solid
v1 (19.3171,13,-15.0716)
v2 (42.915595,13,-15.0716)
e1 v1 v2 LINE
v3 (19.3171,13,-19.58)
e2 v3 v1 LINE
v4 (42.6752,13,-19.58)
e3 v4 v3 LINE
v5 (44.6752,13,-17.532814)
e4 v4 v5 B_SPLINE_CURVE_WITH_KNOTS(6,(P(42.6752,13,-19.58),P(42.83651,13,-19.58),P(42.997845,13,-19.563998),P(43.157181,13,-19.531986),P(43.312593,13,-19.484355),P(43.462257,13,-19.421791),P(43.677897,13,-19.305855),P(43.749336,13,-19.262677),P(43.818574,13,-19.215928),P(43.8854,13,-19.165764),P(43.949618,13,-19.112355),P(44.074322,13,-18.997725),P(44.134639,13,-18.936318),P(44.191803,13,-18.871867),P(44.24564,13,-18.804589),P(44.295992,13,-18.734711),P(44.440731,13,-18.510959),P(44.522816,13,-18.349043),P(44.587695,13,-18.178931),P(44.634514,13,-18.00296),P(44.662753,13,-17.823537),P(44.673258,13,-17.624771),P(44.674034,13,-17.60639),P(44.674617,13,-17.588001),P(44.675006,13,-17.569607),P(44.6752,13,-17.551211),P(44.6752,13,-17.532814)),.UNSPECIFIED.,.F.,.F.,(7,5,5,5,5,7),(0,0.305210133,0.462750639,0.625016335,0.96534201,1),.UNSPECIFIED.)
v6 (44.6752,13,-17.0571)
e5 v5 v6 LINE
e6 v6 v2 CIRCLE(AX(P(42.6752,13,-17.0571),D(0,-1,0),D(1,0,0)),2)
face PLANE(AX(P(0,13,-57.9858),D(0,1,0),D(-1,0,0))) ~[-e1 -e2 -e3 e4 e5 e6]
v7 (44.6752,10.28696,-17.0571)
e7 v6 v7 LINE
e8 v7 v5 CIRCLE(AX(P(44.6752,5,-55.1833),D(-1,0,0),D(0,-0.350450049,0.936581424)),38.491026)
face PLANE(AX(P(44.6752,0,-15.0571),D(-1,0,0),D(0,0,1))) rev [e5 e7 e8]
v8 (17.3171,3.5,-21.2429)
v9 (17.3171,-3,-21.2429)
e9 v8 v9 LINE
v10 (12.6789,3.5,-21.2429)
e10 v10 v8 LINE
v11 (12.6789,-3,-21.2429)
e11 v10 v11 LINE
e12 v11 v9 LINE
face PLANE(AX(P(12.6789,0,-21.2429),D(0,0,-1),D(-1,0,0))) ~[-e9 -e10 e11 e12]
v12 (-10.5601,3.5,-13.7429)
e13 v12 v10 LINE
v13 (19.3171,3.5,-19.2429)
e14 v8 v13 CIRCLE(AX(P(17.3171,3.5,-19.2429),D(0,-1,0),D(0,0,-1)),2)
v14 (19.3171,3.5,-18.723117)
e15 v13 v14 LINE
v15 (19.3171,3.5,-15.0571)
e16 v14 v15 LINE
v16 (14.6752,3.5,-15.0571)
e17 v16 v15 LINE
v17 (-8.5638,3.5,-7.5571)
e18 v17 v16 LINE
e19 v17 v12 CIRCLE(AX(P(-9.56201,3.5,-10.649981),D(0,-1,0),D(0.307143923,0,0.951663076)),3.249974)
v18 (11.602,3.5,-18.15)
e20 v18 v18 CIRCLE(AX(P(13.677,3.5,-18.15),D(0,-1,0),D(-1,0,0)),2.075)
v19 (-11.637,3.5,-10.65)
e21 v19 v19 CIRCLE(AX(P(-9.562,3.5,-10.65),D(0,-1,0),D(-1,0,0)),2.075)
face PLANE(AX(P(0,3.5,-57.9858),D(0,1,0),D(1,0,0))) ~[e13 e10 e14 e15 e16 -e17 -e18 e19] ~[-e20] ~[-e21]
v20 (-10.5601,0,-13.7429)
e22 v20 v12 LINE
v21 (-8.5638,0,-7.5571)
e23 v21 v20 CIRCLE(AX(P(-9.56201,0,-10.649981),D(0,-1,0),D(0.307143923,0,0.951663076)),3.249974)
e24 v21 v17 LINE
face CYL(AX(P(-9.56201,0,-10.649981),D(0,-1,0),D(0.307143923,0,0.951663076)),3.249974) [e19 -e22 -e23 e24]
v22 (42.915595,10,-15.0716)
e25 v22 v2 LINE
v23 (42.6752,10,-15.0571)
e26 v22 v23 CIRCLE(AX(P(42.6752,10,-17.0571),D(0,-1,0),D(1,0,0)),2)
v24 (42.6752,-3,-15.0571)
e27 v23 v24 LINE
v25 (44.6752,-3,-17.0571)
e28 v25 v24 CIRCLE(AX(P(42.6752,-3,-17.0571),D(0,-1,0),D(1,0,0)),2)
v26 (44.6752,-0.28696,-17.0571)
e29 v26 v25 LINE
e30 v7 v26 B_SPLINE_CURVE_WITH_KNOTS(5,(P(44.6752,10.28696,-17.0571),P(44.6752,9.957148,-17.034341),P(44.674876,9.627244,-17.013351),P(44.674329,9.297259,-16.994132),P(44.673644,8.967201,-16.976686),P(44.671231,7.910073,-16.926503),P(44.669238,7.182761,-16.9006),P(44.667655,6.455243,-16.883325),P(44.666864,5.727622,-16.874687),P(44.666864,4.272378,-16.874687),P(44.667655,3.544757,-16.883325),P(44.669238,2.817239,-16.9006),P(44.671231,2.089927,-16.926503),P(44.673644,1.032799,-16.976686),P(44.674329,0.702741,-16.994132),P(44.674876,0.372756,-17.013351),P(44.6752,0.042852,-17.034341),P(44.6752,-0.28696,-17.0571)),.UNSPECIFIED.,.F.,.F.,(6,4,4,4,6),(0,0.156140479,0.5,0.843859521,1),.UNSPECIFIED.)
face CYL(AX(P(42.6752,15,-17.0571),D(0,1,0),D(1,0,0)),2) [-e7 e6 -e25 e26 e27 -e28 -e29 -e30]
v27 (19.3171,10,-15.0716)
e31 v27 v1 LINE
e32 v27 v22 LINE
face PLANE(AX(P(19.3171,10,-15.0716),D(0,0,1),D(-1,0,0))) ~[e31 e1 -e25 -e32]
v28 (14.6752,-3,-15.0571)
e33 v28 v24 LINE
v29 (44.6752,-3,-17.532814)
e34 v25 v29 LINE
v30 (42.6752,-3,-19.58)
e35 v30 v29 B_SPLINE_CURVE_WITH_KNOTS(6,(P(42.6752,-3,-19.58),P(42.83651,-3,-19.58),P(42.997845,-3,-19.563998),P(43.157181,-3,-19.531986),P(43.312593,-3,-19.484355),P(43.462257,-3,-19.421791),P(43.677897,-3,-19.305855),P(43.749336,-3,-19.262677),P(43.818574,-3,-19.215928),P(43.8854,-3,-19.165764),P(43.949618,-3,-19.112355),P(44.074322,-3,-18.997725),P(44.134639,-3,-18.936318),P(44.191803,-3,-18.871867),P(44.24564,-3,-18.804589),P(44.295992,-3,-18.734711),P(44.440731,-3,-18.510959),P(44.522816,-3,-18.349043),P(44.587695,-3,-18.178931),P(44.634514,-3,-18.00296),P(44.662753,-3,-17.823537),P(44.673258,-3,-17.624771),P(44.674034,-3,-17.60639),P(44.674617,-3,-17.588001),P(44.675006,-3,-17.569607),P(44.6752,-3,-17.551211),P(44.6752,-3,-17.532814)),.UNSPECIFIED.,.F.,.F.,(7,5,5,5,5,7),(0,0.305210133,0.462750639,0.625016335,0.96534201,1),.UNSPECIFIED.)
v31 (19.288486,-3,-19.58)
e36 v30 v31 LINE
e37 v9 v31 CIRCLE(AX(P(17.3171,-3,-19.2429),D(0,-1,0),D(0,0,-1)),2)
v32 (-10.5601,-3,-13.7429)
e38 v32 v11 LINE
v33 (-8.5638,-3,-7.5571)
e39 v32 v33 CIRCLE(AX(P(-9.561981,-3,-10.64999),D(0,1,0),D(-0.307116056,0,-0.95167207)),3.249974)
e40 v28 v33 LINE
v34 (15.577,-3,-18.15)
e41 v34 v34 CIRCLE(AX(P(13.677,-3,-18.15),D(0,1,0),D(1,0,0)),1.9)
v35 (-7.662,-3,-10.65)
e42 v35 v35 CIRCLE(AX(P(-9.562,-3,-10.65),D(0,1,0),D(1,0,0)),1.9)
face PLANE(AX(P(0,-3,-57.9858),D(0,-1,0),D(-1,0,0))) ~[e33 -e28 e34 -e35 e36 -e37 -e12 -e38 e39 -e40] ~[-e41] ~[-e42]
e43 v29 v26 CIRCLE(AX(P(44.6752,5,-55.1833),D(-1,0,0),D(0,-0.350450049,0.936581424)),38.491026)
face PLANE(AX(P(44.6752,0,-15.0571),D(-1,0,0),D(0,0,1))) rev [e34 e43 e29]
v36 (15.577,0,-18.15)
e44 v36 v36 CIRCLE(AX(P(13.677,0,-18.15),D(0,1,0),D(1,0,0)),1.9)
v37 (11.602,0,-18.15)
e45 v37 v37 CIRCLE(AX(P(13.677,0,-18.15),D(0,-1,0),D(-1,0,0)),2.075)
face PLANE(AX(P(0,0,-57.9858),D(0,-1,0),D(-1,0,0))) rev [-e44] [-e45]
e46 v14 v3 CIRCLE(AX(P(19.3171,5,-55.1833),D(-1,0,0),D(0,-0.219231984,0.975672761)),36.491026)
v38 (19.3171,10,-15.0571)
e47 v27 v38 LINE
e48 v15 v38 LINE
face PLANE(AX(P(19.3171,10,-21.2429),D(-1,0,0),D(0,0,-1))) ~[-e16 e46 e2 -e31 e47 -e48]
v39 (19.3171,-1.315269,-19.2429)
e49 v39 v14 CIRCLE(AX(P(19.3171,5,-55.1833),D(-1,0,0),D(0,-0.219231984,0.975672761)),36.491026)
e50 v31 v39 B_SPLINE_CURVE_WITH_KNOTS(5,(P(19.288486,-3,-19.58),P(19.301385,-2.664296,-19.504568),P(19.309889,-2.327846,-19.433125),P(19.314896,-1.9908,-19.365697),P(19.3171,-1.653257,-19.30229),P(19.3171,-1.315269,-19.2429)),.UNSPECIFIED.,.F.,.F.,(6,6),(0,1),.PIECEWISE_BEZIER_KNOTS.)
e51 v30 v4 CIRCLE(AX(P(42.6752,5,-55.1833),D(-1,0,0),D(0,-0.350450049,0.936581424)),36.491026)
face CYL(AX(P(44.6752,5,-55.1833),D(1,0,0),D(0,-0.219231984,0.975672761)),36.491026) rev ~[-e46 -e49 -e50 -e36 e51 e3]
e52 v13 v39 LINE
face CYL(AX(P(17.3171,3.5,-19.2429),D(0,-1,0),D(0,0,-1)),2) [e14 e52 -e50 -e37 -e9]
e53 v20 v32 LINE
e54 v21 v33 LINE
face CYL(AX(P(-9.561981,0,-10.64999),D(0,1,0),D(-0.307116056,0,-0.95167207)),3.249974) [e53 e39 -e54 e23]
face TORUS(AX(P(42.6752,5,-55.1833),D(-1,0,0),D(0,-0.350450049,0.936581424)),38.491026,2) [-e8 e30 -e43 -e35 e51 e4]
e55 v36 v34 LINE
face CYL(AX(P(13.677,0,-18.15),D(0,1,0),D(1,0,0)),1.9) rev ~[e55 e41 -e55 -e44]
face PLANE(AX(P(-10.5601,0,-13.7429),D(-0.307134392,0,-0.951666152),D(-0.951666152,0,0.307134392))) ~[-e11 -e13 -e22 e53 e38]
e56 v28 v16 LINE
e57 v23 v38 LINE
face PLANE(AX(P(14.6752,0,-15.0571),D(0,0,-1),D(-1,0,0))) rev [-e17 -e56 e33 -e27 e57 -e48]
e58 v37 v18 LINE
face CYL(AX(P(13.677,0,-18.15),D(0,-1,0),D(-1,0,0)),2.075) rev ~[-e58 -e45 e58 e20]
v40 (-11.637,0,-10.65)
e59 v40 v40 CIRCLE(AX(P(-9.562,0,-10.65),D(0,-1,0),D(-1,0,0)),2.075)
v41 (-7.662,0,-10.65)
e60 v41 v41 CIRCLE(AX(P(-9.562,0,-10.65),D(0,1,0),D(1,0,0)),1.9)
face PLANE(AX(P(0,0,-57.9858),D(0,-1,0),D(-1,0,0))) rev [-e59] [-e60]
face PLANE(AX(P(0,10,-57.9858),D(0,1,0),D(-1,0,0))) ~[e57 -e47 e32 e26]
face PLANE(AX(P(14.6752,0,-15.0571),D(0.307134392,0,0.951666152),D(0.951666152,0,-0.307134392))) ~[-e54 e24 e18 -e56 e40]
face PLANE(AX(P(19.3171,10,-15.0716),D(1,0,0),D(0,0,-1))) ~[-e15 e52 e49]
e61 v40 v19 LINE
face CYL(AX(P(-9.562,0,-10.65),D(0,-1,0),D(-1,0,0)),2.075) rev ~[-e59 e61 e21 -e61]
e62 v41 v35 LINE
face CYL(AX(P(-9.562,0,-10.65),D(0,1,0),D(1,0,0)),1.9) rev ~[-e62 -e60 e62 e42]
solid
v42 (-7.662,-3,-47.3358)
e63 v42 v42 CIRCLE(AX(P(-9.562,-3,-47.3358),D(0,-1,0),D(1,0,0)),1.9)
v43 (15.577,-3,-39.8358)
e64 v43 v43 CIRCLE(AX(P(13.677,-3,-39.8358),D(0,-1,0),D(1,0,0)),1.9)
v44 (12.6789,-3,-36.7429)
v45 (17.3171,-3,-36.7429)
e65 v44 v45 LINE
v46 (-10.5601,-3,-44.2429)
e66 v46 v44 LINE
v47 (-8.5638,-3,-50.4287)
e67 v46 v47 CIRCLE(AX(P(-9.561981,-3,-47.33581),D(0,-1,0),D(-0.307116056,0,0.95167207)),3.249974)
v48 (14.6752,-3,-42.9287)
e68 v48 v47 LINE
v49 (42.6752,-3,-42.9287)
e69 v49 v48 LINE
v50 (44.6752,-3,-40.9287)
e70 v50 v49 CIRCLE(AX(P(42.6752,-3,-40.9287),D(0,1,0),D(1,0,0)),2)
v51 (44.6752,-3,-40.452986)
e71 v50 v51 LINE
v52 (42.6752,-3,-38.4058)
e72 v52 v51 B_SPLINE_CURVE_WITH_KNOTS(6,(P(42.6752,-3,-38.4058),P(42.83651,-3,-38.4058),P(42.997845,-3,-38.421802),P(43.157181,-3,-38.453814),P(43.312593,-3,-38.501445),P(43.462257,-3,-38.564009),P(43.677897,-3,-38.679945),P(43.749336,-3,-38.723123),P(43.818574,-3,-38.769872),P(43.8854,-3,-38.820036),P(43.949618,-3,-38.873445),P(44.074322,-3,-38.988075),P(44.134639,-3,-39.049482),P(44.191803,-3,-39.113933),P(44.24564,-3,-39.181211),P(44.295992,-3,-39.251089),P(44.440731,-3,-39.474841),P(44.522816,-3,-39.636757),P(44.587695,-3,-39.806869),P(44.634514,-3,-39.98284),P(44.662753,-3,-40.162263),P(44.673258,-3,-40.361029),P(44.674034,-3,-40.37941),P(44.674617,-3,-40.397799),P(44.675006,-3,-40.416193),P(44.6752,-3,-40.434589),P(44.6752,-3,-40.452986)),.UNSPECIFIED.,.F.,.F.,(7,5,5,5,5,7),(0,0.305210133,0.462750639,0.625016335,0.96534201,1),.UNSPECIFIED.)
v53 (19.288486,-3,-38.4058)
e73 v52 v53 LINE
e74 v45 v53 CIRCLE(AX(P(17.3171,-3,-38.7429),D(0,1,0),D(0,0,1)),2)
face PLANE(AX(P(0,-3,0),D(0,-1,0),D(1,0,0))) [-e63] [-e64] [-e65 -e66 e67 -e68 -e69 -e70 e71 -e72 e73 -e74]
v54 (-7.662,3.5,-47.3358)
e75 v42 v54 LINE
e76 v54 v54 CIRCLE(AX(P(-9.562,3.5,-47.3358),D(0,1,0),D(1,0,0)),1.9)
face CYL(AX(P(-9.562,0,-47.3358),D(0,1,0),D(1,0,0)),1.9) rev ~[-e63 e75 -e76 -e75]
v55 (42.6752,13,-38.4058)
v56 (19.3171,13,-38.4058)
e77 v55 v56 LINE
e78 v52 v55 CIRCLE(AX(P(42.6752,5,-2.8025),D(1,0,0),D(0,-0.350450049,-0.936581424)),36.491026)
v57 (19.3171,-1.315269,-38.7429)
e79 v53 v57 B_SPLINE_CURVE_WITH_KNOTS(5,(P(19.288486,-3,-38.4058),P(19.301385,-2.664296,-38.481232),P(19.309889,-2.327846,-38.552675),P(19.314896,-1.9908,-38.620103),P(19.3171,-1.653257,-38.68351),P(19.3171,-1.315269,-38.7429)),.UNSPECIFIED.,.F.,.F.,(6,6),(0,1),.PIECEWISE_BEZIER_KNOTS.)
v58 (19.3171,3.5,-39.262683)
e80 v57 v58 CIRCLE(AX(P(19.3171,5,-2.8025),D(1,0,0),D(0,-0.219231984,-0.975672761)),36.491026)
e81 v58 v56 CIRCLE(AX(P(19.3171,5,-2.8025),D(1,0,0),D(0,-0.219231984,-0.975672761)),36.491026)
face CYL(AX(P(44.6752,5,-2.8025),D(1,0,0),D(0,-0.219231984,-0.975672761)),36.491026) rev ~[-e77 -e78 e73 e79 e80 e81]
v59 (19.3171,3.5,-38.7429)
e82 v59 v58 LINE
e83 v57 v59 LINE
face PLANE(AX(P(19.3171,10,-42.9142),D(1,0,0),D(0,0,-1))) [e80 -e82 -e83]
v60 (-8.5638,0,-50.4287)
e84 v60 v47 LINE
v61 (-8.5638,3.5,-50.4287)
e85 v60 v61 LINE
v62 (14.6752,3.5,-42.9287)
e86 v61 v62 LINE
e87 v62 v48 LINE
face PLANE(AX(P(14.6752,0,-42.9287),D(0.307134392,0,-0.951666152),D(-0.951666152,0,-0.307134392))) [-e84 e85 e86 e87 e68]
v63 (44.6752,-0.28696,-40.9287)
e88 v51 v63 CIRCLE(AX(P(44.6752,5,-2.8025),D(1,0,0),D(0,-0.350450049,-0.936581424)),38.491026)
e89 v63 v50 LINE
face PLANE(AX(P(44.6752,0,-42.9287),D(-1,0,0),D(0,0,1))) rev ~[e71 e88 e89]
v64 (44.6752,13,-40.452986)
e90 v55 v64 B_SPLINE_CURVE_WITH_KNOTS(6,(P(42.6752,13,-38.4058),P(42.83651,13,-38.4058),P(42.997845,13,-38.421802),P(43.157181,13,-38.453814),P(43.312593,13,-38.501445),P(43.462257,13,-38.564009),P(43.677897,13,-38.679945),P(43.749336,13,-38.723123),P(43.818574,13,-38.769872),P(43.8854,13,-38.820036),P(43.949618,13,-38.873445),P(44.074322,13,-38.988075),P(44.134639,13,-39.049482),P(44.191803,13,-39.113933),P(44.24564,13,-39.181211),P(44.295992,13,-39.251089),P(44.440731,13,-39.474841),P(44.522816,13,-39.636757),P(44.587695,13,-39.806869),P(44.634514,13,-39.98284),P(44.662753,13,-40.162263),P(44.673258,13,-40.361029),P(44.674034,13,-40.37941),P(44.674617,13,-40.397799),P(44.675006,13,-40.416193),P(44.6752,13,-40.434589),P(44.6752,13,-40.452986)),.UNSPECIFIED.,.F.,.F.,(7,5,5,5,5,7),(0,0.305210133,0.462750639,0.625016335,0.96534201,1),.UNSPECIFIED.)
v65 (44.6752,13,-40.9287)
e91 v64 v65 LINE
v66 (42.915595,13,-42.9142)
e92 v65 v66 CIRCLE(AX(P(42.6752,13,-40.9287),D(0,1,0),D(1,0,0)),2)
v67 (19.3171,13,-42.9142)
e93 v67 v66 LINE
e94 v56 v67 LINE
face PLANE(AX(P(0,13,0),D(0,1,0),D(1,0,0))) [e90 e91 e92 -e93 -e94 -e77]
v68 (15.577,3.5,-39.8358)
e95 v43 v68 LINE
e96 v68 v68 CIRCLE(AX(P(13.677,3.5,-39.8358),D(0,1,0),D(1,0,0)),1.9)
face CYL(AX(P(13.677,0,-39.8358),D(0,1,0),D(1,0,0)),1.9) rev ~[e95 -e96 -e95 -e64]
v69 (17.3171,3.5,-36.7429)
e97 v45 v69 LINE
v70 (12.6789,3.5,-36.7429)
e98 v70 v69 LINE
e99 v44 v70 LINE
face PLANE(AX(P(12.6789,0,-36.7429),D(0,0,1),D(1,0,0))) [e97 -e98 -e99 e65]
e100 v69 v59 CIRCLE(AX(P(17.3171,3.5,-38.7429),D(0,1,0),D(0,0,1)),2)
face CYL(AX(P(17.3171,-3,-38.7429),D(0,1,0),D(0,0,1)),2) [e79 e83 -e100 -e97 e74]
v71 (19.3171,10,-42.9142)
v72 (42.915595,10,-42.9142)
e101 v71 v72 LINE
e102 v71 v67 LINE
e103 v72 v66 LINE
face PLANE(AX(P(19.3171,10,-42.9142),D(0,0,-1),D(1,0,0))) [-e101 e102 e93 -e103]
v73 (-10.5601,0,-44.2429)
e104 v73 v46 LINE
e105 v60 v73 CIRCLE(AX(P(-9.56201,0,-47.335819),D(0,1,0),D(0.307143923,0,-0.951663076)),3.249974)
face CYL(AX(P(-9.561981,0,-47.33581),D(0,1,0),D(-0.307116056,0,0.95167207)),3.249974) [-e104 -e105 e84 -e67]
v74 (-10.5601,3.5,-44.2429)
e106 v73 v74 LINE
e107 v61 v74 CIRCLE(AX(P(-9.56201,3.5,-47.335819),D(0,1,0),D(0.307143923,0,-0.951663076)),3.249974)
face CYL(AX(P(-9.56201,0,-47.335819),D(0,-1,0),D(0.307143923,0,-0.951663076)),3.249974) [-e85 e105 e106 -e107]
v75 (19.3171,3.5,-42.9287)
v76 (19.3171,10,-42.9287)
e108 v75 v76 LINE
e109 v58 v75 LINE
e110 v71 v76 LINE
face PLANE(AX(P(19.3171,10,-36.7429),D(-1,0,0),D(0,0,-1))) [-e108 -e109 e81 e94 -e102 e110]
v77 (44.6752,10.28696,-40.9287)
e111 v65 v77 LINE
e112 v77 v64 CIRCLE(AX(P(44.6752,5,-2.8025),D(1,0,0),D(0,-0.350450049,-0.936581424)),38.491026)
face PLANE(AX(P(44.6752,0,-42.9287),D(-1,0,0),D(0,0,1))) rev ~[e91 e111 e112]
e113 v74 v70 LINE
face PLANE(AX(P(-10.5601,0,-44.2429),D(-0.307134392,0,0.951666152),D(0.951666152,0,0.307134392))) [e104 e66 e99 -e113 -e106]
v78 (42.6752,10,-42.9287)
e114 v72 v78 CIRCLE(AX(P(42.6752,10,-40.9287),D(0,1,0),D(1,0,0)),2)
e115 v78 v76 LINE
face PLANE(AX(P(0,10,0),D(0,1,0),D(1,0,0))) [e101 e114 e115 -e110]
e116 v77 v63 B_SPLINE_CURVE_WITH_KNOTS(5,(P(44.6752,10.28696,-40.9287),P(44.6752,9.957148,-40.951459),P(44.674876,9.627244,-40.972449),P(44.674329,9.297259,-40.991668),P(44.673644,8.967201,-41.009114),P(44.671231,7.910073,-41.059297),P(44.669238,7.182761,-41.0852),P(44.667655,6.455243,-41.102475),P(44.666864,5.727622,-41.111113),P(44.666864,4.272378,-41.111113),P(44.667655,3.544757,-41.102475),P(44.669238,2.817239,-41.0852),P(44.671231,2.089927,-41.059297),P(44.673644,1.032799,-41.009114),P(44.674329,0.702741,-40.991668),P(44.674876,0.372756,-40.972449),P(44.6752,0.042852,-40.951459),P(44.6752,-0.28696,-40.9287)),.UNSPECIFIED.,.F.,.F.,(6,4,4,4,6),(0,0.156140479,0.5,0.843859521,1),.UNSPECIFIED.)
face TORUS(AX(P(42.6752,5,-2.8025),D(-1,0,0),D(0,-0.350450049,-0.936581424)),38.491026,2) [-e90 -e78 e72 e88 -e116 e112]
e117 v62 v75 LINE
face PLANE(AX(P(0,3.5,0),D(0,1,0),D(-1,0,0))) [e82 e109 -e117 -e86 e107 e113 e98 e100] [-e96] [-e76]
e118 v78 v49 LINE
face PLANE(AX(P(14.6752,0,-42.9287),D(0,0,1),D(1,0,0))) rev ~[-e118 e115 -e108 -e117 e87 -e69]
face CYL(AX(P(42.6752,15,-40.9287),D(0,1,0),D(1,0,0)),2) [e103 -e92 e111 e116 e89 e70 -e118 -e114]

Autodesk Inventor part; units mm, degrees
ref_plane "YZ Plane" through (0, 0, 0) normal (1, 0, 0) x (0, 1, 0)
ref_plane "XZ Plane" through (0, 0, 0) normal (0, 1, 0) x (-1, 0, 0)
ref_plane "XY Plane" through (0, 0, 0) normal (0, 0, 1) x (1, 0, 0)
sketch "Sketch1" plane through (0, 0, 0) normal (0, 1, 0) x (-1, 0, 0)
  line L0 (27.1998, -28.5532) -> (-70.2595, -28.5532)
  circle A0 centre (9.562, -47.3358) radius 2.075
  arc A1 (8.5638, -50.4287) -> (10.5601, -44.2429) centre (9.562, -47.3358) ccw
  circle A2 centre (-13.677, -39.8358) radius 2.075
  line L1 (10.5601, -44.2429) -> (-12.6789, -36.7429)
  line L2 (8.5638, -50.4287) -> (-14.6752, -42.9287)
  line L3 (-14.6752, -42.9287) -> (-44.6752, -42.9287)
  line L4 (-12.6789, -36.7429) -> (-19.3171, -36.7429)
  line L5 (-44.6752, -38.4058) -> (-44.6752, -42.9287)
  line L6 (-19.3171, -36.7429) -> (-44.6752, -38.4058)
  circle A3 centre (9.562, -9.7705) radius 2.075
  arc A4 (10.5601, -12.8635) -> (8.5638, -6.6776) centre (9.562, -9.7705) ccw
  circle A5 centre (-13.677, -17.2705) radius 2.075
  line L7 (10.5601, -12.8635) -> (-12.6789, -20.3635)
  line L8 (8.5638, -6.6776) -> (-14.6752, -14.1776)
  line L9 (-14.6752, -14.1776) -> (-44.6752, -14.1776)
  line L10 (-12.6789, -20.3635) -> (-19.3171, -20.3635)
  line L11 (-44.6752, -18.7005) -> (-44.6752, -14.1776)
  line L12 (-19.3171, -20.3635) -> (-44.6752, -18.7005)
  dimension "d26" = 4.15
extrude "Extrusion1" add sketch "Sketch1" along normal blind 3.5 contours L2 L3 L5 L6 L4 L1 A1
sketch "Sketch2" plane through (0, 3.5, 0) normal (0, 1, 0) x (1, 0, 0)
  line L0 (19.3171, 36.7429) -> (44.6752, 38.4058) projected
  line L1 (19.3171, 36.7429) -> (44.6752, 38.4058)
  line L2 (19.3171, 36.7429) -> (19.3171, 42.9287)
  line L3 (44.6752, 42.9287) -> (14.6752, 42.9287) projected
  line L4 (19.3171, 42.9287) -> (44.6752, 42.9287)
  line L5 (44.6752, 42.9287) -> (44.6752, 38.4058)
  point P0 (0, 0)
  point P1 (44.6752, 18.7005)
  point P2 (19.3171, 20.3635)
  point P3 (44.6752, 14.1776)
extrude "Extrusion2" add sketch "Sketch2" along normal blind 6.5
sketch "Sketch4" plane through (0, 10, 0) normal (0, 1, 0) x (1, 0, 0)
  line L0 (19.3171, 36.7429) -> (44.6752, 38.4058) projected
  line L1 (19.3171, 36.7429) -> (19.3171, 42.9142)
  line L2 (19.3171, 42.9142) -> (44.6752, 42.9142)
  line L3 (44.6752, 38.4058) -> (44.6752, 42.9287) projected
  line L4 (44.6752, 42.9142) -> (44.6752, 38.4058)
  line L5 (44.6752, 38.4058) -> (19.3171, 36.7429)
  point P0 (0, 0)
extrude "Extrusion4" add sketch "Sketch4" along normal blind 3
sketch "Sketch5" plane through (0, 0, 0) normal (0, -1, 0) x (1, 0, 0)
  line L0 (14.6752, -42.9287) -> (-8.5638, -50.4287) projected
  line L1 (44.6752, -42.9287) -> (19.3171, -42.9287) projected
  line L2 (14.6752, -42.9287) -> (44.6752, -42.9287)
  line L3 (19.3171, -36.7429) -> (44.6752, -38.4058) projected
  line L4 (44.6752, -42.9287) -> (44.6752, -38.4058)
  line L5 (44.6752, -38.4058) -> (19.3171, -36.7429)
  line L6 (12.6789, -36.7429) -> (19.3171, -36.7429) projected
  line L7 (19.3171, -36.7429) -> (12.6789, -36.7429)
  line L8 (-10.5601, -44.2429) -> (12.6789, -36.7429) projected
  line L9 (12.6789, -36.7429) -> (-10.5601, -44.2429)
  arc A0 (-10.5601, -44.2429) -> (-8.5638, -50.4287) centre (-9.562, -47.3358) ccw
  circle A1 centre (-9.562, -47.3358) radius 1.9
  circle A2 centre (13.677, -39.8358) radius 1.9
  point P0 (0, 0)
  dimension "d27" = 3.8
  dimension "d28" = 3.8
extrude "Extrusion5" add sketch "Sketch5" along normal blind 3
sketch "Sketch6" plane through (-9.562, 0, -47.3358) normal (0, 1, 0) x (1, 0, 0)
  circle A0 centre (0, 0) radius 1.9
  circle A1 centre (0, 0) radius 2.075
  circle A2 centre (23.239, -7.5) radius 1.9 projected
  circle A3 centre (23.239, -7.5) radius 1.9
  circle A4 centre (23.239, -7.5) radius 2.075
  point P0 (9.562, -47.3358)
extrude "Extrusion6" add sketch "Sketch6" along normal up to surface (3.5 mm away)
sketch "Sketch7" plane through (44.6752, 10, -42.9142) normal (1, 0, 0) x (0, 0, -1)
  line L0 (-6.1713, 3) -> (-4.5084, 3) projected
  arc A0 (-4.5084, -13) -> (-4.5084, 3) centre (-40.1117, -5) ccw
  line L1 (0.0145, -13) -> (-4.5084, -13) projected
  line L2 (-4.5084, 3) -> (-14.8639, 3)
  line L3 (-14.8639, 3) -> (-14.8639, -13)
  line L4 (-14.8639, -13) -> (-4.5084, -13)
  line L5 (-4.5084, -13) -> (-4.5084, 3)
  point P0 (-42.9142, -10)
extrude "Extrusion7" cut sketch "Sketch7" against normal up to surface (25.3581 mm away)
fillet "Fillet4" radius 2 1 edges at (19.3171, 0.25, -36.7429)
fillet "Fillet5" radius 2 2 edges at (44.6752, 5, -39.2935) (44.6752, 3.5, -42.9287)
ref_plane "Work Plane1" through (12.6789, -3, -28.9929) normal (0, 0, 1) x (1, 0, 0)
mirror "Mirror1" about plane through (12.6789, -3, -28.9929) normal (0, 0, 1) of "Extrusion1", "Extrusion5", "Fillet4", "Extrusion7", "Extrusion4", "Fillet5", "Extrusion2"
properties part number "grips"
